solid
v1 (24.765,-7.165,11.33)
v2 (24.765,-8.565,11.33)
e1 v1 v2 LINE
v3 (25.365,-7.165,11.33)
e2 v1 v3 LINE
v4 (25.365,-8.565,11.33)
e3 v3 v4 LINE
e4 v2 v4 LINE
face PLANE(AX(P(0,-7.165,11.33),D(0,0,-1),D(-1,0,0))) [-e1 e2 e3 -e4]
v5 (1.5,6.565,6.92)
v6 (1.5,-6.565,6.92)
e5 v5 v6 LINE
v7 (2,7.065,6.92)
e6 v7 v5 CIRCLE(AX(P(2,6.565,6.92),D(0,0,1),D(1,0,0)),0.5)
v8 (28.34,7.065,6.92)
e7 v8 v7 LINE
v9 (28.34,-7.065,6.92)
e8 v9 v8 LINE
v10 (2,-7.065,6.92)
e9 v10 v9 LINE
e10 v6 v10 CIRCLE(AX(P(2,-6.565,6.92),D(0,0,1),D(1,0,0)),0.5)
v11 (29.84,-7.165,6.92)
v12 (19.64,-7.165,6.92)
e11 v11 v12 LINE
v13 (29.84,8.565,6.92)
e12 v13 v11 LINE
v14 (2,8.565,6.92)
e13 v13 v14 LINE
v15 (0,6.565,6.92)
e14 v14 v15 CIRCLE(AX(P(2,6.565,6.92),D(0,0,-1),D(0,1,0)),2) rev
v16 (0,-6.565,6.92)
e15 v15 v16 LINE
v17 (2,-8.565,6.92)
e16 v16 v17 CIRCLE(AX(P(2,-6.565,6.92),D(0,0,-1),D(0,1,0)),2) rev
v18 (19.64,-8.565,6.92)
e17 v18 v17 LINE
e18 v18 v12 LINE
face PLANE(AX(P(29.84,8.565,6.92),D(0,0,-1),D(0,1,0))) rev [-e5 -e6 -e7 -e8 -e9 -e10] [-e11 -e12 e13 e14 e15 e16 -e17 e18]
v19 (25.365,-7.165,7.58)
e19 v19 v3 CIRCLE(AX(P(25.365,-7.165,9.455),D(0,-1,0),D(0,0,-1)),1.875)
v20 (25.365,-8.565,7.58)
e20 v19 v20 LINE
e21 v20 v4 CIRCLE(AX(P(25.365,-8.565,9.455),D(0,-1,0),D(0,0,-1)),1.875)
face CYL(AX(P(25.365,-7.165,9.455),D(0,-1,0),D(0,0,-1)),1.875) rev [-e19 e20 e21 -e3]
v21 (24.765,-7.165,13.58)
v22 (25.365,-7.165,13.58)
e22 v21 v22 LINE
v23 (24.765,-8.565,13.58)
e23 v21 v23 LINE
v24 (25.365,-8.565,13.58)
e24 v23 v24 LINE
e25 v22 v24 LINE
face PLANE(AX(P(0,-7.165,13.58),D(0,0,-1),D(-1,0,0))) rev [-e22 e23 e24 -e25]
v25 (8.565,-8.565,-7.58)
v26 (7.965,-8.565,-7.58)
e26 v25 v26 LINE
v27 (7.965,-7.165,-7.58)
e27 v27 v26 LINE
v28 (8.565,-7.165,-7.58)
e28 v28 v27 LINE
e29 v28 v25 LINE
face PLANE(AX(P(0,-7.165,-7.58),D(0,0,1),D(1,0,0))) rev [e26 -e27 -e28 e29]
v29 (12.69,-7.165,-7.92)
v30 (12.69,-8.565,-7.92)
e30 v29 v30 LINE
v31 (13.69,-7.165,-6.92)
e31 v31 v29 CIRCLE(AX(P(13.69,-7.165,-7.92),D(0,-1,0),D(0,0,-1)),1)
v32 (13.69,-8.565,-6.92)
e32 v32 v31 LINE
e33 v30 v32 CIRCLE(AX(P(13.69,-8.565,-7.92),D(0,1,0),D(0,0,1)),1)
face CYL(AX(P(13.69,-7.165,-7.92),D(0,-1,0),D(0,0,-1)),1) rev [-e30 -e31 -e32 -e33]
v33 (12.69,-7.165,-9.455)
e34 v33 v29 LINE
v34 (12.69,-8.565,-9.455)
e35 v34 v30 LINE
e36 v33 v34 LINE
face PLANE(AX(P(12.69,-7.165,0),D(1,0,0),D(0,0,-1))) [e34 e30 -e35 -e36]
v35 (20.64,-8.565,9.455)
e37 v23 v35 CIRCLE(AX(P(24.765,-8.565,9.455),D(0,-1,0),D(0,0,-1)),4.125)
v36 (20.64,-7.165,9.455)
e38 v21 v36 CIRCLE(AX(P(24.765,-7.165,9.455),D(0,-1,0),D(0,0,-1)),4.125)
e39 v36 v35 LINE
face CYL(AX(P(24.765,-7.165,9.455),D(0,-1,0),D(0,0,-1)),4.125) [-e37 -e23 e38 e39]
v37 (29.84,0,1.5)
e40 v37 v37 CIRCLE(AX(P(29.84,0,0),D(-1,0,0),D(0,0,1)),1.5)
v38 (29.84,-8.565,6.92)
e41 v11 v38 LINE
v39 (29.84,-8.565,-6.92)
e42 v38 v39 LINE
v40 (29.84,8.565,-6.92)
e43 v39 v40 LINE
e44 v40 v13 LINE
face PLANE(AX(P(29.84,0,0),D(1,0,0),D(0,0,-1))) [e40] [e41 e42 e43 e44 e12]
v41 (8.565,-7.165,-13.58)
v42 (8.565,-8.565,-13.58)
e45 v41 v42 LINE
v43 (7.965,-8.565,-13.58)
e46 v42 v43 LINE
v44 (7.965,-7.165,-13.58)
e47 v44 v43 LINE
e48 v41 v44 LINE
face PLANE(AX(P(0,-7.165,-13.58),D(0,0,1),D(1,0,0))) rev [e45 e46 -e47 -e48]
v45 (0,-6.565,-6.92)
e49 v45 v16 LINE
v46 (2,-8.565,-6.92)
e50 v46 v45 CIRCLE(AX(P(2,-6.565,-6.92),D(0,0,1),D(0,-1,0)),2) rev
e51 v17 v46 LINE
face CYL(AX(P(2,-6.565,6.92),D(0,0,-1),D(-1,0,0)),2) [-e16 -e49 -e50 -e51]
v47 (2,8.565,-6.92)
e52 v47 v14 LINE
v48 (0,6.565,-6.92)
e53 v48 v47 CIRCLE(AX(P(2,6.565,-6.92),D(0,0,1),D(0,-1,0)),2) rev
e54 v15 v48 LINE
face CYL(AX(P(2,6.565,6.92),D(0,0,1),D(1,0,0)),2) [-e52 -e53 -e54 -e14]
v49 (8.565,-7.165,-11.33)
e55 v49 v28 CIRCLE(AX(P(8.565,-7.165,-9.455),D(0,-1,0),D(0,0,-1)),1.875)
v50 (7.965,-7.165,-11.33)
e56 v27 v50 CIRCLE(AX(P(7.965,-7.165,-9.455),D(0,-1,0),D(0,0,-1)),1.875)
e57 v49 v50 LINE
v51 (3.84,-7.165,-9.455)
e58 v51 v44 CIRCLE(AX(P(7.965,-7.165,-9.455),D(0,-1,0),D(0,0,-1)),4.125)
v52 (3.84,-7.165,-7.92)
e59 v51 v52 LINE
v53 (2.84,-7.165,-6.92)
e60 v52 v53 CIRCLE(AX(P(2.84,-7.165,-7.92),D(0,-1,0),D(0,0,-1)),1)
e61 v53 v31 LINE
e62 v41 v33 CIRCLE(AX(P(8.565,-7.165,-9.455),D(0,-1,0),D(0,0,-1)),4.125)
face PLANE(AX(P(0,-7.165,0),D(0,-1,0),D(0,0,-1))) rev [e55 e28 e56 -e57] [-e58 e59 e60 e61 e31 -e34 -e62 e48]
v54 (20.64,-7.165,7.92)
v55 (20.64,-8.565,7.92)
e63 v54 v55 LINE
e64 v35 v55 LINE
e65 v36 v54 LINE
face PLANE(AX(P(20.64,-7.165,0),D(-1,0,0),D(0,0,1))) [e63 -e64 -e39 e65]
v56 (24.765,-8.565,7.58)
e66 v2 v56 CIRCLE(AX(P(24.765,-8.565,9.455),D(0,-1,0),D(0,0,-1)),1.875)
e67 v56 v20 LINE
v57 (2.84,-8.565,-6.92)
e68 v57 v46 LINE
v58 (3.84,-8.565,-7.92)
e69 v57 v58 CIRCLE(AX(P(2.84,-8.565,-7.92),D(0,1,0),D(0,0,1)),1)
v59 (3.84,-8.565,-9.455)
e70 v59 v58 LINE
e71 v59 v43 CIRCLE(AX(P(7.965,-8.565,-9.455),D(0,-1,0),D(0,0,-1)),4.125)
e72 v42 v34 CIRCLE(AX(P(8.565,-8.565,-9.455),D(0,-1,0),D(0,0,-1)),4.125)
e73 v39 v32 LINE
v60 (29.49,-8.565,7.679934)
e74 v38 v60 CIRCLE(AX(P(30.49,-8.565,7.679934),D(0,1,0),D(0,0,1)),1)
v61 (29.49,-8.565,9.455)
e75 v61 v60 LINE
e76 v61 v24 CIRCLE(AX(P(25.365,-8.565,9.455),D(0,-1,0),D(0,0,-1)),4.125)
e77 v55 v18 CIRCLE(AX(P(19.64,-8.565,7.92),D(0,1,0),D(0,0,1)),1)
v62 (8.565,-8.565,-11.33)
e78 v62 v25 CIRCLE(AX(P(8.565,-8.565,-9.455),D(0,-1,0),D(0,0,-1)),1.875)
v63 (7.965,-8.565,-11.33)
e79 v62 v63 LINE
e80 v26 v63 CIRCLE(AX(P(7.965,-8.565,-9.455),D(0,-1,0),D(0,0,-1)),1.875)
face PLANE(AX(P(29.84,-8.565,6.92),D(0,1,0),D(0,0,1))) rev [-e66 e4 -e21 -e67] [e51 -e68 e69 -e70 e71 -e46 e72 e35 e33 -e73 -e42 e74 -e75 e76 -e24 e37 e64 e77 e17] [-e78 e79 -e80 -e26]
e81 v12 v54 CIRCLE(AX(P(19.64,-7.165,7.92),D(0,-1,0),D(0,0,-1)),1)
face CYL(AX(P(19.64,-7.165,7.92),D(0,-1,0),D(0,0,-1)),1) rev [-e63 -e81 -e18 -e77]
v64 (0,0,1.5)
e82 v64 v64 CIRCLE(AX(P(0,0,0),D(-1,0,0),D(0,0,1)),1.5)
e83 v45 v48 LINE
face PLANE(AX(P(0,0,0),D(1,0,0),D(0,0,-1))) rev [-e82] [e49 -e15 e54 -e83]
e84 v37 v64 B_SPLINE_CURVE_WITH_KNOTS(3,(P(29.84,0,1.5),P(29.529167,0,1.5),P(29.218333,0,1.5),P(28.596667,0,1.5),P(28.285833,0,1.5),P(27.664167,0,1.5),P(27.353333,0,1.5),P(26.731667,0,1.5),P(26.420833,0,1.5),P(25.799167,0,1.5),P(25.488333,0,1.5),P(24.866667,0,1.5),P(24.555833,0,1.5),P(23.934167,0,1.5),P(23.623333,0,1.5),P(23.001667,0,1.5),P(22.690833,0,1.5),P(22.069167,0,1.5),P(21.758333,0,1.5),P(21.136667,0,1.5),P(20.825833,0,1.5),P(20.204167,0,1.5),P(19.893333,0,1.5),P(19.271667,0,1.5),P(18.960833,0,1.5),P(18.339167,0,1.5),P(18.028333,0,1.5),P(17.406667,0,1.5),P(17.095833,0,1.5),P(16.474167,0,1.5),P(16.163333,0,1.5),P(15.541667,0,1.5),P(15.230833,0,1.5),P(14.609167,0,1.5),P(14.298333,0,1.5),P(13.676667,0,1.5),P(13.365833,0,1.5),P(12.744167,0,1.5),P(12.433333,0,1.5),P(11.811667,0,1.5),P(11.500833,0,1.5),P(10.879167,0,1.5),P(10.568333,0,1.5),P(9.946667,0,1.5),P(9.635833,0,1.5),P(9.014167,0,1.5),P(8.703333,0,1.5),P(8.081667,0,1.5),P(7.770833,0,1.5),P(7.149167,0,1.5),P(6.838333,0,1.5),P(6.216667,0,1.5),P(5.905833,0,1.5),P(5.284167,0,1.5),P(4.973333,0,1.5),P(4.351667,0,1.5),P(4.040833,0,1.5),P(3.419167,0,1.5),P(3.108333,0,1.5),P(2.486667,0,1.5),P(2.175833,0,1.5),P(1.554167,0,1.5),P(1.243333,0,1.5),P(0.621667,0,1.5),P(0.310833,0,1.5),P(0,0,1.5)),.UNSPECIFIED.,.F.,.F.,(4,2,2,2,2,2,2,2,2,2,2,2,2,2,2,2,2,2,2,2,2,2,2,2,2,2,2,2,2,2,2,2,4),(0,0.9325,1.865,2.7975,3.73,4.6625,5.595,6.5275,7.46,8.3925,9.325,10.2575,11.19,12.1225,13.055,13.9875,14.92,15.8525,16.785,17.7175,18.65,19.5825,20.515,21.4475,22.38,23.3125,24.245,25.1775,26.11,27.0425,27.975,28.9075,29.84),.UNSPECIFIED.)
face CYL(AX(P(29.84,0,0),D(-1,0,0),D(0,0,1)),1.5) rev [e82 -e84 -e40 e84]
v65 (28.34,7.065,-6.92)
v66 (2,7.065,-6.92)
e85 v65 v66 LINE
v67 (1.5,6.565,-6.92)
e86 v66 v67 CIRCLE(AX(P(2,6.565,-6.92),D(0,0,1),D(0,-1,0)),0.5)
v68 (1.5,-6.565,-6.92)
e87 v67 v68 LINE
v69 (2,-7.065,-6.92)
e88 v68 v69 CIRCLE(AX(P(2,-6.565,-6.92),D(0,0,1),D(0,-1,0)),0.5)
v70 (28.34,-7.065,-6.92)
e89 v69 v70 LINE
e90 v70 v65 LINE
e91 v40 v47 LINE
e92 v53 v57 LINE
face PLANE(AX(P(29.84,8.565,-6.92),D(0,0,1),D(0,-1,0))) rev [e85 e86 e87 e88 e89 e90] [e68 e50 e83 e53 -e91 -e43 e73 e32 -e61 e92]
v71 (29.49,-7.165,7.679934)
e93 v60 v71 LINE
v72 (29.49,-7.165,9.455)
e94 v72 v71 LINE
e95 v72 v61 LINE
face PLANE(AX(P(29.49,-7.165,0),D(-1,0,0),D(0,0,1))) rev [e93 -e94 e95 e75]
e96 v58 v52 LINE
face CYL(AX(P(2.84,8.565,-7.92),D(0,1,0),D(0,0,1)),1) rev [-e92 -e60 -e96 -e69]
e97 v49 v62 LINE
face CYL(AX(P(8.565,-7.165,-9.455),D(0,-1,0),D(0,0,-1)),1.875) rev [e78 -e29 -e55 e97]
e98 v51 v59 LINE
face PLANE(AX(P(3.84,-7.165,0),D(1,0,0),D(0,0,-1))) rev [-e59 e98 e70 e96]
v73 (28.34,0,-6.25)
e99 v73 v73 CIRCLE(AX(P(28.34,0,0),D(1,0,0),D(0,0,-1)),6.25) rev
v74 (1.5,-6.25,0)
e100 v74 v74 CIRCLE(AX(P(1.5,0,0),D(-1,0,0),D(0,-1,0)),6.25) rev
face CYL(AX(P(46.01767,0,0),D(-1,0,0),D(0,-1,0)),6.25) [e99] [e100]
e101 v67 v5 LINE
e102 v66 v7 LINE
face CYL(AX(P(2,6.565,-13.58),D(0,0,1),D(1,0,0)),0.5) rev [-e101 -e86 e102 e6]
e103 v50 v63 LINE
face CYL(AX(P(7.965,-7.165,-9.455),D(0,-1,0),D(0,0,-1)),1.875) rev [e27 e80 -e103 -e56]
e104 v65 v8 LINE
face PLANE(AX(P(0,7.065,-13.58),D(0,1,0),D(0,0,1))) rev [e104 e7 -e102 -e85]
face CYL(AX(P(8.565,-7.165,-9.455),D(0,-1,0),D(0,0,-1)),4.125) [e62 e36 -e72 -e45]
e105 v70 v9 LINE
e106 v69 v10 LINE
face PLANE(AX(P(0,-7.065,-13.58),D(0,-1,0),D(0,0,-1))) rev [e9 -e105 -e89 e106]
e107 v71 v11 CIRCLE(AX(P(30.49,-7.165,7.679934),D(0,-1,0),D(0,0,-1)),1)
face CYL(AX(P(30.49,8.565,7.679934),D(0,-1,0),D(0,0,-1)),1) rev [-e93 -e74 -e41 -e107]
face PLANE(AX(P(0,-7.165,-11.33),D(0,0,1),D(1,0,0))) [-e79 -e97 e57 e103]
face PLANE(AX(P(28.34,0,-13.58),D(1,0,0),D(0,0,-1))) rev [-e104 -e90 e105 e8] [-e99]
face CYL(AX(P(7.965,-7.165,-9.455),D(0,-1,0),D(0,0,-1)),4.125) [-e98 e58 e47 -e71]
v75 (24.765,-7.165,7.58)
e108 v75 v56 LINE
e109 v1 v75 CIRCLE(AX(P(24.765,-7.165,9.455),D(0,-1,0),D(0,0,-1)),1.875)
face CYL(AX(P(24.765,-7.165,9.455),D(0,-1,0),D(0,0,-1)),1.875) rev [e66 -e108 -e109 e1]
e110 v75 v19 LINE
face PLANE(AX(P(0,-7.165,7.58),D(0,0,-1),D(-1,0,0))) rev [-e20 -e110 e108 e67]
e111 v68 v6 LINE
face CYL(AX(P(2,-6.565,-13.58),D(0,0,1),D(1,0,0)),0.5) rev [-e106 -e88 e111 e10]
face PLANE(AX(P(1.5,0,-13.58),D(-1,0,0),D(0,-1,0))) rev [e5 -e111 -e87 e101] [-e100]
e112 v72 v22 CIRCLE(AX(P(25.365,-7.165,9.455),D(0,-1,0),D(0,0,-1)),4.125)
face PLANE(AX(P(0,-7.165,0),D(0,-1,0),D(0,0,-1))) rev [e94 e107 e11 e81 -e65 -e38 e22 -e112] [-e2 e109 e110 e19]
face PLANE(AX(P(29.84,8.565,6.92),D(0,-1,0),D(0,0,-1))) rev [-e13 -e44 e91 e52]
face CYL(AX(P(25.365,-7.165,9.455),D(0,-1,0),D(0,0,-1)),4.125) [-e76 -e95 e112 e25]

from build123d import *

# Parameters (mm, degrees)
SKETCH1_W           = 13.84
SKETCH1_H           = 17.13
BOSS_EXTRUDE1_DEPTH = 29.84
SKETCH2_R           = 1.5
CUT_EXTRUDE1_DEPTH  = 29.84
BOSS_EXTRUDE2_DEPTH = 1.4
FILLET1_R           = 2
FILLET2_R           = 1
SKETCH4_W           = 10.2
SKETCH4_H           = 1.4
CUT_EXTRUDE2_DEPTH  = 38.202618523
SKETCH5_R           = 6.25
SKETCH5_R_2         = 1.5
BOSS_EXTRUDE3_DEPTH = 26.84


with BuildPart() as part:
    # Sketch1 → Boss-Extrude1 (new body)
    with BuildSketch(Plane(origin=(0, 0, 0), x_dir=(0, 0, -1), z_dir=(1, 0, 0))):
        Rectangle(SKETCH1_W, SKETCH1_H)
    extrude(amount=BOSS_EXTRUDE1_DEPTH)

    # Sketch2 → Cut-Extrude1 (cut)
    with BuildSketch(Plane.ZY):
        Circle(SKETCH2_R)
    extrude(amount=-CUT_EXTRUDE1_DEPTH, mode=Mode.SUBTRACT)

    # Sketch3 → Boss-Extrude2 (add)
    # profile 1 of 2: a face of its own
    with BuildSketch(Plane.XZ.offset(8.565)):
        with BuildLine():
            Line((20.64, 9.455), (20.64, 6.92))
            Line((20.64, 6.92), (29.49, 6.92))
            Line((29.49, 6.92), (29.49, 9.455))
            ThreePointArc((29.49, 9.455), (28.281815472, 12.371815472), (25.365, 13.58))
            Line((25.365, 13.58), (24.765, 13.58))
            ThreePointArc((24.765, 13.58), (21.848184528, 12.371815472), (20.64, 9.455))
        make_face()
        with BuildLine():
            ThreePointArc((24.765, 7.58), (22.89, 9.455), (24.765, 11.33))
            Line((24.765, 11.33), (25.365, 11.33))
            ThreePointArc((25.365, 11.33), (27.24, 9.455), (25.365, 7.58))
            Line((25.365, 7.58), (24.765, 7.58))
        make_face(mode=Mode.SUBTRACT)
    # profile 2 of 2: a face of its own
    with BuildSketch(Plane.XZ.offset(8.565)):
        with BuildLine():
            Line((3.84, -6.92), (3.84, -9.455))
            ThreePointArc((3.84, -9.455), (5.048184528, -12.371815472), (7.965, -13.58))
            Line((7.965, -13.58), (8.565, -13.58))
            ThreePointArc((8.565, -13.58), (11.481815472, -12.371815472), (12.69, -9.455))
            Line((12.69, -9.455), (12.69, -6.92))
            Line((12.69, -6.92), (3.84, -6.92))
        make_face()
        with BuildLine():
            ThreePointArc((8.565, -7.58), (10.44, -9.455), (8.565, -11.33))
            Line((8.565, -11.33), (7.965, -11.33))
            ThreePointArc((7.965, -11.33), (6.09, -9.455), (7.965, -7.58))
            Line((7.965, -7.58), (8.565, -7.58))
        make_face(mode=Mode.SUBTRACT)
    extrude(amount=-BOSS_EXTRUDE2_DEPTH)

    # Fillet1
    fillet1_edges = [part.edges().sort_by_distance(p)[0] for p in [
        (0, -8.565, 0),
        (0, 8.565, 0),
    ]]
    fillet(fillet1_edges, radius=FILLET1_R)

    # Fillet2
    # the kernel refuses this fillet: 1 mm, written as the material it adds along each edge
    with BuildSketch(Plane(origin=(3.84, -8.565, -6.92), x_dir=(-1, 0, 0), z_dir=(0, 1, 0))) as fillet2_piece_1:
        with BuildLine():
            CenterArc((FILLET2_R, -FILLET2_R), FILLET2_R, 90, 90)
            Line((0, -FILLET2_R), (-FILLET2_R * 0.02, -FILLET2_R))
            Line((-FILLET2_R * 0.02, -FILLET2_R), (-FILLET2_R * 0.02, FILLET2_R * 0.02))
            Line((-FILLET2_R * 0.02, FILLET2_R * 0.02), (FILLET2_R, FILLET2_R * 0.02))
            Line((FILLET2_R, FILLET2_R * 0.02), (FILLET2_R, 0))
        make_face()
    extrude(amount=1.4)
    with BuildSketch(Plane(origin=(20.64, -8.565, 6.92), x_dir=(-1, 0, 0), z_dir=(0, 1, 0)), Plane(origin=(12.69, -8.565, -6.92), x_dir=(1, 0, 0), z_dir=(0, 1, 0))) as fillet2_piece_2:
        with BuildLine():
            CenterArc((FILLET2_R, FILLET2_R), FILLET2_R, 180, 90)
            Line((0, FILLET2_R), (-FILLET2_R * 0.02, FILLET2_R))
            Line((-FILLET2_R * 0.02, FILLET2_R), (-FILLET2_R * 0.02, -FILLET2_R * 0.02))
            Line((-FILLET2_R * 0.02, -FILLET2_R * 0.02), (FILLET2_R, -FILLET2_R * 0.02))
            Line((FILLET2_R, -FILLET2_R * 0.02), (FILLET2_R, 0))
        make_face()
    extrude(amount=1.4)
    with BuildSketch(Plane(origin=(29.49, -8.565, 6.92), x_dir=(1, 0, 0), z_dir=(0, 1, 0))) as fillet2_piece_3:
        with BuildLine():
            CenterArc((1, -0.759934208), FILLET2_R, 130.541601874, 49.458398126)
            Line((0, -0.759934208), (-0.02, -0.759934208))
            Line((-0.02, -0.759934208), (-0.02, 0))
            Line((-0.02, 0), (0, 0.02))
            ThreePointArc((0, 0.02), (0.175, 0.02), (0.337, 0.015198684))
            Line((0.337, 0.015198684), (0.35, 0))
        make_face()
    extrude(amount=1.4)

    # Sketch4 → Cut-Extrude2 (cut, through all)
    with BuildSketch(Plane.XY.offset(6.92)):
        with BuildLine():
            Line((18.14, -7.065), (18.14, -5.665))
            Line((18.14, -5.665), (28.34, -5.665))
            Line((28.34, -5.665), (28.34, 7.065))
            Line((28.34, 7.065), (2, 7.065))
            ThreePointArc((2, 7.065), (1.646446609, 6.918553391), (1.5, 6.565))
            Line((1.5, 6.565), (1.5, -6.565))
            ThreePointArc((1.5, -6.565), (1.646446609, -6.918553391), (2, -7.065))
            Line((2, -7.065), (18.14, -7.065))
        make_face()
        with Locations((23.24, -6.365)):
            Rectangle(SKETCH4_W, SKETCH4_H)
    extrude(amount=-CUT_EXTRUDE2_DEPTH, mode=Mode.SUBTRACT)

    # Sketch5 → Boss-Extrude3 (add)
    with BuildSketch(Plane(origin=(1.5, 0, 0), x_dir=(0, 0, -1), z_dir=(1, 0, 0))):
        with Locations(Location((0, 0, 0), (0, 0, 270))):
            Circle(SKETCH5_R)
        with Locations(Location((0, 0, 0), (0, 0, 180))):
            Circle(SKETCH5_R_2, mode=Mode.SUBTRACT)
    extrude(amount=BOSS_EXTRUDE3_DEPTH)


solid = part.part
